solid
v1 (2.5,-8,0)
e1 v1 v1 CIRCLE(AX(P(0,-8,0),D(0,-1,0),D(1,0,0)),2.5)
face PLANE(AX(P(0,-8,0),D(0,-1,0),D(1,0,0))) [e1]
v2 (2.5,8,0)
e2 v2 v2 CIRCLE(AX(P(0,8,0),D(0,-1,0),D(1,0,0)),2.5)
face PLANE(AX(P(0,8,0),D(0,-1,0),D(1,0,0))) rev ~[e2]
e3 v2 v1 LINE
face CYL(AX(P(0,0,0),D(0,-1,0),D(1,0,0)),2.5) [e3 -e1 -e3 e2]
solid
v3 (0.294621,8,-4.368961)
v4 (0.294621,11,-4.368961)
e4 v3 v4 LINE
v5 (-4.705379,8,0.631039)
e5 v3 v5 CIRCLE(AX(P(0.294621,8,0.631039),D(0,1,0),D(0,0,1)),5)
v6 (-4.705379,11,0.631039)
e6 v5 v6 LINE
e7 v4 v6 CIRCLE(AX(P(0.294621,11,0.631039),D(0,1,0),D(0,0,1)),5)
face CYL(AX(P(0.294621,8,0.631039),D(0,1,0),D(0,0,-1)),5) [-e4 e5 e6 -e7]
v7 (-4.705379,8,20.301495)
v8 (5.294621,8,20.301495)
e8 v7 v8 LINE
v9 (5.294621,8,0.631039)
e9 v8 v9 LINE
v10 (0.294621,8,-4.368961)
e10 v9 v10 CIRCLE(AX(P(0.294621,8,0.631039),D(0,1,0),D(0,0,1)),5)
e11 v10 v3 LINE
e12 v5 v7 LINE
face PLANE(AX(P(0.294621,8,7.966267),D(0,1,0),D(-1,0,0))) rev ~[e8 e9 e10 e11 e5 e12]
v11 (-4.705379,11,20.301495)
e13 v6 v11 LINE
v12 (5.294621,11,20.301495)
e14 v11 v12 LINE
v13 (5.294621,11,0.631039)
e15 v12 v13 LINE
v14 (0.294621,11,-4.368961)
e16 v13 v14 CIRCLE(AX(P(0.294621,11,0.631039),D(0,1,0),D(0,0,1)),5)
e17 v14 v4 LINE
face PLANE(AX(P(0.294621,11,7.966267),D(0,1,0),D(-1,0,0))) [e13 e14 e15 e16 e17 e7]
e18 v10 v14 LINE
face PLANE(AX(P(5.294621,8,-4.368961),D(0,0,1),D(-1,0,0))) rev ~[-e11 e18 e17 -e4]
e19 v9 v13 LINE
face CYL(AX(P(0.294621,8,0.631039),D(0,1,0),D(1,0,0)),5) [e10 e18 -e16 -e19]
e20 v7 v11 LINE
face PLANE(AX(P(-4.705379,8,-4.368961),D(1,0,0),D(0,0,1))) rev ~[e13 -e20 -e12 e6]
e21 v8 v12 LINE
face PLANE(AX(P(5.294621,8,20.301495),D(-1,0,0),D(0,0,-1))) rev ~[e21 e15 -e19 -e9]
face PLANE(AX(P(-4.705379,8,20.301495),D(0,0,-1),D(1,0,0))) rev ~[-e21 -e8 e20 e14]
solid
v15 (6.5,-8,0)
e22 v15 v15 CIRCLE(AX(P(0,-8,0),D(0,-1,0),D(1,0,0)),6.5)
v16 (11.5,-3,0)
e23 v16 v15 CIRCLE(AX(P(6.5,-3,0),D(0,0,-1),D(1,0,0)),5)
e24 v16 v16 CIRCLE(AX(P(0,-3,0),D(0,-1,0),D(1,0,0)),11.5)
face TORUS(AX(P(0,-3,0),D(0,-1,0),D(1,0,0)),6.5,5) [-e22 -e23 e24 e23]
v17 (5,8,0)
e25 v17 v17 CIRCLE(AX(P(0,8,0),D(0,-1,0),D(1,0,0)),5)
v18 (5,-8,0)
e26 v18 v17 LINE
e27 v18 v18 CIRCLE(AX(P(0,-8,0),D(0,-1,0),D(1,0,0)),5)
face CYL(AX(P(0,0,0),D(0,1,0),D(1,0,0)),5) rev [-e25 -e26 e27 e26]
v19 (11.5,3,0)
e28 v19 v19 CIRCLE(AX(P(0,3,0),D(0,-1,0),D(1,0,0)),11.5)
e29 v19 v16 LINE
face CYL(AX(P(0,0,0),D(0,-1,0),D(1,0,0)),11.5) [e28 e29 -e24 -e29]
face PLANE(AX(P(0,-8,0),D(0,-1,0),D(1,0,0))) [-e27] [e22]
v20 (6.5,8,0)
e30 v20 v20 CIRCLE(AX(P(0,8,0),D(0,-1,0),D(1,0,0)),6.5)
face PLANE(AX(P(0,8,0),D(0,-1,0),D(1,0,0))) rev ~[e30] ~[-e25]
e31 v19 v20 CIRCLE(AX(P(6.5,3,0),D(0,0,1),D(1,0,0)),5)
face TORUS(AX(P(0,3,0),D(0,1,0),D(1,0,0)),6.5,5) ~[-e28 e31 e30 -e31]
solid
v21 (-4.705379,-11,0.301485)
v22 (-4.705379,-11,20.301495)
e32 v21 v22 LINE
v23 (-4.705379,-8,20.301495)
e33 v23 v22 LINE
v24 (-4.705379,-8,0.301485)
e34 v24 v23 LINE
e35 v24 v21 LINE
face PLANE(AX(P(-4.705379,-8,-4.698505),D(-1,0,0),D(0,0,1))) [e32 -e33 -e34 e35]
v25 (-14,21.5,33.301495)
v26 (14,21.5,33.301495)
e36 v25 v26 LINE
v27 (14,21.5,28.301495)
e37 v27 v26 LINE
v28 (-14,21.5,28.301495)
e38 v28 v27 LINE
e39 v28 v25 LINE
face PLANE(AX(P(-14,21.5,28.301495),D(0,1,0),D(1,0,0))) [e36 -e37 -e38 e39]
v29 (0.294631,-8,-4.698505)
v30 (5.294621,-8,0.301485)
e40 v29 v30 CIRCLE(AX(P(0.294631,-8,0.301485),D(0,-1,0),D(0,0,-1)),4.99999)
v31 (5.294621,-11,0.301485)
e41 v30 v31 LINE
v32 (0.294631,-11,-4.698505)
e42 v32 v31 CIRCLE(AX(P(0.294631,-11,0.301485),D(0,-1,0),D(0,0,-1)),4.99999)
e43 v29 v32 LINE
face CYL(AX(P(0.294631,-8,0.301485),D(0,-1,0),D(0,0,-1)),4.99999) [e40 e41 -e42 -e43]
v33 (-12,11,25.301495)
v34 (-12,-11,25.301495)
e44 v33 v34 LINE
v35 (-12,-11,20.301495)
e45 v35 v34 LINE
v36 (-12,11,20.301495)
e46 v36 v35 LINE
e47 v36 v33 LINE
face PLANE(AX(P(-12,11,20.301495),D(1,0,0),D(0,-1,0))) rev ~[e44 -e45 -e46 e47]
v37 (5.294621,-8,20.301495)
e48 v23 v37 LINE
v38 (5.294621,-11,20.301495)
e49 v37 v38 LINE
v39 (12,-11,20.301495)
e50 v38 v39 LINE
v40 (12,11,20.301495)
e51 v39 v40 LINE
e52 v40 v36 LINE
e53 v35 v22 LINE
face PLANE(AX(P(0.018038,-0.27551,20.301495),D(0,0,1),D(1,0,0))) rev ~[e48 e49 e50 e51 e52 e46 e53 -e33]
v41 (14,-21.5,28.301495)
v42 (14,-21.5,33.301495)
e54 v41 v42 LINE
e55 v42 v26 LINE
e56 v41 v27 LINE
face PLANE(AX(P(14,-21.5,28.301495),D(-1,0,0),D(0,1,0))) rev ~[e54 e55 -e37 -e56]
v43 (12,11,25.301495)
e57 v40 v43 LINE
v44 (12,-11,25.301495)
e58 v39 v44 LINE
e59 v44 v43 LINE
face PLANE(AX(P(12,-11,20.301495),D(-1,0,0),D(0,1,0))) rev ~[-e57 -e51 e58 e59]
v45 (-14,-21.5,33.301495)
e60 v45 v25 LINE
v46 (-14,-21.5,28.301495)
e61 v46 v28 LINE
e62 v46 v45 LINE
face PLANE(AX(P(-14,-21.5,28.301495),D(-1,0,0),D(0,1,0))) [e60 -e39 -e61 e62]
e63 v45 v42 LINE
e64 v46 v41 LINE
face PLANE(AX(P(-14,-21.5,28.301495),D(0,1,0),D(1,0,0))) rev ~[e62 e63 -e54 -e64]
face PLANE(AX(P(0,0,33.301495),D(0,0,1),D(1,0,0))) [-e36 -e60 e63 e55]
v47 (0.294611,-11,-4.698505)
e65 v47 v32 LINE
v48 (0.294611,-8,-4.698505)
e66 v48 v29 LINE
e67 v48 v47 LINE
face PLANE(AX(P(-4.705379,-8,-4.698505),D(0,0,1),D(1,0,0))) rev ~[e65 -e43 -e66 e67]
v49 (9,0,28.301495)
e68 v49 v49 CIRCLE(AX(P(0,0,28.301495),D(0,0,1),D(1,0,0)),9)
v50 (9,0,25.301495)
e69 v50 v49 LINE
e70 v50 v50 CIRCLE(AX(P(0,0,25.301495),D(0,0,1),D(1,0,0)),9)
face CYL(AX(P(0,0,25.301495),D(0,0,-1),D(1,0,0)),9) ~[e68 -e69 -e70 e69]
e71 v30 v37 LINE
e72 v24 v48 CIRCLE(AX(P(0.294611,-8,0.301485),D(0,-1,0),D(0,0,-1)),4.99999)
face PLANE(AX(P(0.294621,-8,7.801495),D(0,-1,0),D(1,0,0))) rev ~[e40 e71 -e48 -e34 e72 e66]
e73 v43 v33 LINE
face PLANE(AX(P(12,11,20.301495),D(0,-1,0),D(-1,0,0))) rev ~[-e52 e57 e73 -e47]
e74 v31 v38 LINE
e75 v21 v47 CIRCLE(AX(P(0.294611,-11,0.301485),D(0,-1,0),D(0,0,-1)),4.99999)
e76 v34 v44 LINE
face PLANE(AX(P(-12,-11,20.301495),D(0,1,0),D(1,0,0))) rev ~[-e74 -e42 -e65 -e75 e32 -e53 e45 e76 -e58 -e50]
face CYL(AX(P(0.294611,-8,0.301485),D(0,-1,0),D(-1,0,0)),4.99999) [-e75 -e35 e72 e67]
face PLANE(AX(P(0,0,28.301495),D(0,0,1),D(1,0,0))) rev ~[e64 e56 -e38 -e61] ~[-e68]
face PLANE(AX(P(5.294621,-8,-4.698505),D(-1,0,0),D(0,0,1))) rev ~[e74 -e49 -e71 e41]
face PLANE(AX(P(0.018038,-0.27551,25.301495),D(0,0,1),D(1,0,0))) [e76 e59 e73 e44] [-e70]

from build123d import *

# Parameters (mm, degrees)
F0_R      = 2.5
F1_DEPTH  = 8
F0_R_2    = 11.5
F0_R_3    = 5
F2_R      = 5
F3_W      = 10
F3_H      = 25
F3_R      = 2.5
F4_DEPTH  = 3
F5_R      = 4.99999
F6_W      = 10
F6_H      = 3
F7_DEPTH  = 5
F8_R      = 2.5
F9_DEPTH  = 3
F10_R     = 5
F11_R     = 9
F12_DEPTH = 3
F13_W     = 28
F13_H     = 43
F13_R     = 9
F14_DEPTH = 5


# Not quite as in the source:
# - a fillet or chamfer is up to 0.001 mm smaller than in the source, because OpenCascade refuses the exact size


with BuildPart() as f1:
    # F0 (on Front) → F1 (new body, symmetric)
    with BuildSketch(Plane.XZ):
        Circle(F0_R)
    extrude(amount=F1_DEPTH, both=True)


with BuildPart() as f1b:
    # F0 (on Front) → F1, piece 2 (new body, symmetric)
    with BuildSketch(Plane.XZ):
        Circle(F0_R_2)
        Circle(F0_R_3, mode=Mode.SUBTRACT)
    extrude(amount=F1_DEPTH, both=True)

    # F2
    f2_edges = [f1b.edges().sort_by_distance(p)[0] for p in [
        (-11.5, 8, 0),
        (11.5, 0, 0),
        (-11.5, -8, 0),
    ]]
    fillet(f2_edges, radius=F2_R)


with BuildPart() as f4:
    # F3 (on face) → F4 (new body)
    with BuildSketch(Plane.XZ.offset(8)):
        with Locations((0.2946209682, 7.8014951967)):
            Rectangle(F3_W, F3_H)
        Circle(F3_R, mode=Mode.SUBTRACT)
        Circle(F3_R)
    extrude(amount=F4_DEPTH)

    # F5 (radius 5 in the source; OpenCascade refuses exactly that, so slightly less here)
    f5_edges = [f4.edges().sort_by_distance(p)[0] for p in [
        (-4.705379, -9.5, -4.698505),
        (5.294621, -9.5, -4.698505),
    ]]
    fillet(f5_edges, radius=F5_R)

    # F6 (on face) → F7 (join)
    with BuildSketch(Plane.XY.offset(20.3014951967)):
        Polygon((5.2946209682, -11), (12, -11), (12, 11), (-12, 11), (-12, -11), (-4.7053790318, -11), (-4.7053790318, -8), (5.2946209682, -8), align=None)
        with Locations((0.2946209682, -9.5)):
            Rectangle(F6_W, F6_H)
    extrude(amount=F7_DEPTH)

    # F11 (on face) → F12 (join)
    with BuildSketch(Plane.XY.offset(25.3014951967)):
        Circle(F11_R)
    extrude(amount=F12_DEPTH)

    # F13 (on face) → F14 (join)
    with BuildSketch(Plane.XY.offset(28.3014951967)):
        Rectangle(F13_W, F13_H)
        Circle(F13_R, mode=Mode.SUBTRACT)
        Circle(F13_R)
    extrude(amount=F14_DEPTH)


with BuildPart() as f9:
    # F8 (on face) → F9 (new body)
    with BuildSketch(Plane(origin=(0, 8, 0), x_dir=(-1, 0, 0), z_dir=(0, 1, 0))):
        Polygon((4.7053790318, 20.3014951967), (-5.2946209908, 20.3014951967), (-5.2946209908, 4.3689608574), (-5.2946209908, -4.3689608574), (4.7053790318, -4.3689608574), (4.7053790318, 4.3689608574), align=None)
        Circle(F8_R, mode=Mode.SUBTRACT)
        Circle(F8_R)
    extrude(amount=F9_DEPTH)

    # F10
    f10_edges = [f9.edges().sort_by_distance(p)[0] for p in [
        (5.294621, 9.5, -4.368961),
        (-4.705379, 9.5, -4.368961),
    ]]
    fillet(f10_edges, radius=F10_R)


solid = Compound([f1.part, f1b.part, f4.part, f9.part])
